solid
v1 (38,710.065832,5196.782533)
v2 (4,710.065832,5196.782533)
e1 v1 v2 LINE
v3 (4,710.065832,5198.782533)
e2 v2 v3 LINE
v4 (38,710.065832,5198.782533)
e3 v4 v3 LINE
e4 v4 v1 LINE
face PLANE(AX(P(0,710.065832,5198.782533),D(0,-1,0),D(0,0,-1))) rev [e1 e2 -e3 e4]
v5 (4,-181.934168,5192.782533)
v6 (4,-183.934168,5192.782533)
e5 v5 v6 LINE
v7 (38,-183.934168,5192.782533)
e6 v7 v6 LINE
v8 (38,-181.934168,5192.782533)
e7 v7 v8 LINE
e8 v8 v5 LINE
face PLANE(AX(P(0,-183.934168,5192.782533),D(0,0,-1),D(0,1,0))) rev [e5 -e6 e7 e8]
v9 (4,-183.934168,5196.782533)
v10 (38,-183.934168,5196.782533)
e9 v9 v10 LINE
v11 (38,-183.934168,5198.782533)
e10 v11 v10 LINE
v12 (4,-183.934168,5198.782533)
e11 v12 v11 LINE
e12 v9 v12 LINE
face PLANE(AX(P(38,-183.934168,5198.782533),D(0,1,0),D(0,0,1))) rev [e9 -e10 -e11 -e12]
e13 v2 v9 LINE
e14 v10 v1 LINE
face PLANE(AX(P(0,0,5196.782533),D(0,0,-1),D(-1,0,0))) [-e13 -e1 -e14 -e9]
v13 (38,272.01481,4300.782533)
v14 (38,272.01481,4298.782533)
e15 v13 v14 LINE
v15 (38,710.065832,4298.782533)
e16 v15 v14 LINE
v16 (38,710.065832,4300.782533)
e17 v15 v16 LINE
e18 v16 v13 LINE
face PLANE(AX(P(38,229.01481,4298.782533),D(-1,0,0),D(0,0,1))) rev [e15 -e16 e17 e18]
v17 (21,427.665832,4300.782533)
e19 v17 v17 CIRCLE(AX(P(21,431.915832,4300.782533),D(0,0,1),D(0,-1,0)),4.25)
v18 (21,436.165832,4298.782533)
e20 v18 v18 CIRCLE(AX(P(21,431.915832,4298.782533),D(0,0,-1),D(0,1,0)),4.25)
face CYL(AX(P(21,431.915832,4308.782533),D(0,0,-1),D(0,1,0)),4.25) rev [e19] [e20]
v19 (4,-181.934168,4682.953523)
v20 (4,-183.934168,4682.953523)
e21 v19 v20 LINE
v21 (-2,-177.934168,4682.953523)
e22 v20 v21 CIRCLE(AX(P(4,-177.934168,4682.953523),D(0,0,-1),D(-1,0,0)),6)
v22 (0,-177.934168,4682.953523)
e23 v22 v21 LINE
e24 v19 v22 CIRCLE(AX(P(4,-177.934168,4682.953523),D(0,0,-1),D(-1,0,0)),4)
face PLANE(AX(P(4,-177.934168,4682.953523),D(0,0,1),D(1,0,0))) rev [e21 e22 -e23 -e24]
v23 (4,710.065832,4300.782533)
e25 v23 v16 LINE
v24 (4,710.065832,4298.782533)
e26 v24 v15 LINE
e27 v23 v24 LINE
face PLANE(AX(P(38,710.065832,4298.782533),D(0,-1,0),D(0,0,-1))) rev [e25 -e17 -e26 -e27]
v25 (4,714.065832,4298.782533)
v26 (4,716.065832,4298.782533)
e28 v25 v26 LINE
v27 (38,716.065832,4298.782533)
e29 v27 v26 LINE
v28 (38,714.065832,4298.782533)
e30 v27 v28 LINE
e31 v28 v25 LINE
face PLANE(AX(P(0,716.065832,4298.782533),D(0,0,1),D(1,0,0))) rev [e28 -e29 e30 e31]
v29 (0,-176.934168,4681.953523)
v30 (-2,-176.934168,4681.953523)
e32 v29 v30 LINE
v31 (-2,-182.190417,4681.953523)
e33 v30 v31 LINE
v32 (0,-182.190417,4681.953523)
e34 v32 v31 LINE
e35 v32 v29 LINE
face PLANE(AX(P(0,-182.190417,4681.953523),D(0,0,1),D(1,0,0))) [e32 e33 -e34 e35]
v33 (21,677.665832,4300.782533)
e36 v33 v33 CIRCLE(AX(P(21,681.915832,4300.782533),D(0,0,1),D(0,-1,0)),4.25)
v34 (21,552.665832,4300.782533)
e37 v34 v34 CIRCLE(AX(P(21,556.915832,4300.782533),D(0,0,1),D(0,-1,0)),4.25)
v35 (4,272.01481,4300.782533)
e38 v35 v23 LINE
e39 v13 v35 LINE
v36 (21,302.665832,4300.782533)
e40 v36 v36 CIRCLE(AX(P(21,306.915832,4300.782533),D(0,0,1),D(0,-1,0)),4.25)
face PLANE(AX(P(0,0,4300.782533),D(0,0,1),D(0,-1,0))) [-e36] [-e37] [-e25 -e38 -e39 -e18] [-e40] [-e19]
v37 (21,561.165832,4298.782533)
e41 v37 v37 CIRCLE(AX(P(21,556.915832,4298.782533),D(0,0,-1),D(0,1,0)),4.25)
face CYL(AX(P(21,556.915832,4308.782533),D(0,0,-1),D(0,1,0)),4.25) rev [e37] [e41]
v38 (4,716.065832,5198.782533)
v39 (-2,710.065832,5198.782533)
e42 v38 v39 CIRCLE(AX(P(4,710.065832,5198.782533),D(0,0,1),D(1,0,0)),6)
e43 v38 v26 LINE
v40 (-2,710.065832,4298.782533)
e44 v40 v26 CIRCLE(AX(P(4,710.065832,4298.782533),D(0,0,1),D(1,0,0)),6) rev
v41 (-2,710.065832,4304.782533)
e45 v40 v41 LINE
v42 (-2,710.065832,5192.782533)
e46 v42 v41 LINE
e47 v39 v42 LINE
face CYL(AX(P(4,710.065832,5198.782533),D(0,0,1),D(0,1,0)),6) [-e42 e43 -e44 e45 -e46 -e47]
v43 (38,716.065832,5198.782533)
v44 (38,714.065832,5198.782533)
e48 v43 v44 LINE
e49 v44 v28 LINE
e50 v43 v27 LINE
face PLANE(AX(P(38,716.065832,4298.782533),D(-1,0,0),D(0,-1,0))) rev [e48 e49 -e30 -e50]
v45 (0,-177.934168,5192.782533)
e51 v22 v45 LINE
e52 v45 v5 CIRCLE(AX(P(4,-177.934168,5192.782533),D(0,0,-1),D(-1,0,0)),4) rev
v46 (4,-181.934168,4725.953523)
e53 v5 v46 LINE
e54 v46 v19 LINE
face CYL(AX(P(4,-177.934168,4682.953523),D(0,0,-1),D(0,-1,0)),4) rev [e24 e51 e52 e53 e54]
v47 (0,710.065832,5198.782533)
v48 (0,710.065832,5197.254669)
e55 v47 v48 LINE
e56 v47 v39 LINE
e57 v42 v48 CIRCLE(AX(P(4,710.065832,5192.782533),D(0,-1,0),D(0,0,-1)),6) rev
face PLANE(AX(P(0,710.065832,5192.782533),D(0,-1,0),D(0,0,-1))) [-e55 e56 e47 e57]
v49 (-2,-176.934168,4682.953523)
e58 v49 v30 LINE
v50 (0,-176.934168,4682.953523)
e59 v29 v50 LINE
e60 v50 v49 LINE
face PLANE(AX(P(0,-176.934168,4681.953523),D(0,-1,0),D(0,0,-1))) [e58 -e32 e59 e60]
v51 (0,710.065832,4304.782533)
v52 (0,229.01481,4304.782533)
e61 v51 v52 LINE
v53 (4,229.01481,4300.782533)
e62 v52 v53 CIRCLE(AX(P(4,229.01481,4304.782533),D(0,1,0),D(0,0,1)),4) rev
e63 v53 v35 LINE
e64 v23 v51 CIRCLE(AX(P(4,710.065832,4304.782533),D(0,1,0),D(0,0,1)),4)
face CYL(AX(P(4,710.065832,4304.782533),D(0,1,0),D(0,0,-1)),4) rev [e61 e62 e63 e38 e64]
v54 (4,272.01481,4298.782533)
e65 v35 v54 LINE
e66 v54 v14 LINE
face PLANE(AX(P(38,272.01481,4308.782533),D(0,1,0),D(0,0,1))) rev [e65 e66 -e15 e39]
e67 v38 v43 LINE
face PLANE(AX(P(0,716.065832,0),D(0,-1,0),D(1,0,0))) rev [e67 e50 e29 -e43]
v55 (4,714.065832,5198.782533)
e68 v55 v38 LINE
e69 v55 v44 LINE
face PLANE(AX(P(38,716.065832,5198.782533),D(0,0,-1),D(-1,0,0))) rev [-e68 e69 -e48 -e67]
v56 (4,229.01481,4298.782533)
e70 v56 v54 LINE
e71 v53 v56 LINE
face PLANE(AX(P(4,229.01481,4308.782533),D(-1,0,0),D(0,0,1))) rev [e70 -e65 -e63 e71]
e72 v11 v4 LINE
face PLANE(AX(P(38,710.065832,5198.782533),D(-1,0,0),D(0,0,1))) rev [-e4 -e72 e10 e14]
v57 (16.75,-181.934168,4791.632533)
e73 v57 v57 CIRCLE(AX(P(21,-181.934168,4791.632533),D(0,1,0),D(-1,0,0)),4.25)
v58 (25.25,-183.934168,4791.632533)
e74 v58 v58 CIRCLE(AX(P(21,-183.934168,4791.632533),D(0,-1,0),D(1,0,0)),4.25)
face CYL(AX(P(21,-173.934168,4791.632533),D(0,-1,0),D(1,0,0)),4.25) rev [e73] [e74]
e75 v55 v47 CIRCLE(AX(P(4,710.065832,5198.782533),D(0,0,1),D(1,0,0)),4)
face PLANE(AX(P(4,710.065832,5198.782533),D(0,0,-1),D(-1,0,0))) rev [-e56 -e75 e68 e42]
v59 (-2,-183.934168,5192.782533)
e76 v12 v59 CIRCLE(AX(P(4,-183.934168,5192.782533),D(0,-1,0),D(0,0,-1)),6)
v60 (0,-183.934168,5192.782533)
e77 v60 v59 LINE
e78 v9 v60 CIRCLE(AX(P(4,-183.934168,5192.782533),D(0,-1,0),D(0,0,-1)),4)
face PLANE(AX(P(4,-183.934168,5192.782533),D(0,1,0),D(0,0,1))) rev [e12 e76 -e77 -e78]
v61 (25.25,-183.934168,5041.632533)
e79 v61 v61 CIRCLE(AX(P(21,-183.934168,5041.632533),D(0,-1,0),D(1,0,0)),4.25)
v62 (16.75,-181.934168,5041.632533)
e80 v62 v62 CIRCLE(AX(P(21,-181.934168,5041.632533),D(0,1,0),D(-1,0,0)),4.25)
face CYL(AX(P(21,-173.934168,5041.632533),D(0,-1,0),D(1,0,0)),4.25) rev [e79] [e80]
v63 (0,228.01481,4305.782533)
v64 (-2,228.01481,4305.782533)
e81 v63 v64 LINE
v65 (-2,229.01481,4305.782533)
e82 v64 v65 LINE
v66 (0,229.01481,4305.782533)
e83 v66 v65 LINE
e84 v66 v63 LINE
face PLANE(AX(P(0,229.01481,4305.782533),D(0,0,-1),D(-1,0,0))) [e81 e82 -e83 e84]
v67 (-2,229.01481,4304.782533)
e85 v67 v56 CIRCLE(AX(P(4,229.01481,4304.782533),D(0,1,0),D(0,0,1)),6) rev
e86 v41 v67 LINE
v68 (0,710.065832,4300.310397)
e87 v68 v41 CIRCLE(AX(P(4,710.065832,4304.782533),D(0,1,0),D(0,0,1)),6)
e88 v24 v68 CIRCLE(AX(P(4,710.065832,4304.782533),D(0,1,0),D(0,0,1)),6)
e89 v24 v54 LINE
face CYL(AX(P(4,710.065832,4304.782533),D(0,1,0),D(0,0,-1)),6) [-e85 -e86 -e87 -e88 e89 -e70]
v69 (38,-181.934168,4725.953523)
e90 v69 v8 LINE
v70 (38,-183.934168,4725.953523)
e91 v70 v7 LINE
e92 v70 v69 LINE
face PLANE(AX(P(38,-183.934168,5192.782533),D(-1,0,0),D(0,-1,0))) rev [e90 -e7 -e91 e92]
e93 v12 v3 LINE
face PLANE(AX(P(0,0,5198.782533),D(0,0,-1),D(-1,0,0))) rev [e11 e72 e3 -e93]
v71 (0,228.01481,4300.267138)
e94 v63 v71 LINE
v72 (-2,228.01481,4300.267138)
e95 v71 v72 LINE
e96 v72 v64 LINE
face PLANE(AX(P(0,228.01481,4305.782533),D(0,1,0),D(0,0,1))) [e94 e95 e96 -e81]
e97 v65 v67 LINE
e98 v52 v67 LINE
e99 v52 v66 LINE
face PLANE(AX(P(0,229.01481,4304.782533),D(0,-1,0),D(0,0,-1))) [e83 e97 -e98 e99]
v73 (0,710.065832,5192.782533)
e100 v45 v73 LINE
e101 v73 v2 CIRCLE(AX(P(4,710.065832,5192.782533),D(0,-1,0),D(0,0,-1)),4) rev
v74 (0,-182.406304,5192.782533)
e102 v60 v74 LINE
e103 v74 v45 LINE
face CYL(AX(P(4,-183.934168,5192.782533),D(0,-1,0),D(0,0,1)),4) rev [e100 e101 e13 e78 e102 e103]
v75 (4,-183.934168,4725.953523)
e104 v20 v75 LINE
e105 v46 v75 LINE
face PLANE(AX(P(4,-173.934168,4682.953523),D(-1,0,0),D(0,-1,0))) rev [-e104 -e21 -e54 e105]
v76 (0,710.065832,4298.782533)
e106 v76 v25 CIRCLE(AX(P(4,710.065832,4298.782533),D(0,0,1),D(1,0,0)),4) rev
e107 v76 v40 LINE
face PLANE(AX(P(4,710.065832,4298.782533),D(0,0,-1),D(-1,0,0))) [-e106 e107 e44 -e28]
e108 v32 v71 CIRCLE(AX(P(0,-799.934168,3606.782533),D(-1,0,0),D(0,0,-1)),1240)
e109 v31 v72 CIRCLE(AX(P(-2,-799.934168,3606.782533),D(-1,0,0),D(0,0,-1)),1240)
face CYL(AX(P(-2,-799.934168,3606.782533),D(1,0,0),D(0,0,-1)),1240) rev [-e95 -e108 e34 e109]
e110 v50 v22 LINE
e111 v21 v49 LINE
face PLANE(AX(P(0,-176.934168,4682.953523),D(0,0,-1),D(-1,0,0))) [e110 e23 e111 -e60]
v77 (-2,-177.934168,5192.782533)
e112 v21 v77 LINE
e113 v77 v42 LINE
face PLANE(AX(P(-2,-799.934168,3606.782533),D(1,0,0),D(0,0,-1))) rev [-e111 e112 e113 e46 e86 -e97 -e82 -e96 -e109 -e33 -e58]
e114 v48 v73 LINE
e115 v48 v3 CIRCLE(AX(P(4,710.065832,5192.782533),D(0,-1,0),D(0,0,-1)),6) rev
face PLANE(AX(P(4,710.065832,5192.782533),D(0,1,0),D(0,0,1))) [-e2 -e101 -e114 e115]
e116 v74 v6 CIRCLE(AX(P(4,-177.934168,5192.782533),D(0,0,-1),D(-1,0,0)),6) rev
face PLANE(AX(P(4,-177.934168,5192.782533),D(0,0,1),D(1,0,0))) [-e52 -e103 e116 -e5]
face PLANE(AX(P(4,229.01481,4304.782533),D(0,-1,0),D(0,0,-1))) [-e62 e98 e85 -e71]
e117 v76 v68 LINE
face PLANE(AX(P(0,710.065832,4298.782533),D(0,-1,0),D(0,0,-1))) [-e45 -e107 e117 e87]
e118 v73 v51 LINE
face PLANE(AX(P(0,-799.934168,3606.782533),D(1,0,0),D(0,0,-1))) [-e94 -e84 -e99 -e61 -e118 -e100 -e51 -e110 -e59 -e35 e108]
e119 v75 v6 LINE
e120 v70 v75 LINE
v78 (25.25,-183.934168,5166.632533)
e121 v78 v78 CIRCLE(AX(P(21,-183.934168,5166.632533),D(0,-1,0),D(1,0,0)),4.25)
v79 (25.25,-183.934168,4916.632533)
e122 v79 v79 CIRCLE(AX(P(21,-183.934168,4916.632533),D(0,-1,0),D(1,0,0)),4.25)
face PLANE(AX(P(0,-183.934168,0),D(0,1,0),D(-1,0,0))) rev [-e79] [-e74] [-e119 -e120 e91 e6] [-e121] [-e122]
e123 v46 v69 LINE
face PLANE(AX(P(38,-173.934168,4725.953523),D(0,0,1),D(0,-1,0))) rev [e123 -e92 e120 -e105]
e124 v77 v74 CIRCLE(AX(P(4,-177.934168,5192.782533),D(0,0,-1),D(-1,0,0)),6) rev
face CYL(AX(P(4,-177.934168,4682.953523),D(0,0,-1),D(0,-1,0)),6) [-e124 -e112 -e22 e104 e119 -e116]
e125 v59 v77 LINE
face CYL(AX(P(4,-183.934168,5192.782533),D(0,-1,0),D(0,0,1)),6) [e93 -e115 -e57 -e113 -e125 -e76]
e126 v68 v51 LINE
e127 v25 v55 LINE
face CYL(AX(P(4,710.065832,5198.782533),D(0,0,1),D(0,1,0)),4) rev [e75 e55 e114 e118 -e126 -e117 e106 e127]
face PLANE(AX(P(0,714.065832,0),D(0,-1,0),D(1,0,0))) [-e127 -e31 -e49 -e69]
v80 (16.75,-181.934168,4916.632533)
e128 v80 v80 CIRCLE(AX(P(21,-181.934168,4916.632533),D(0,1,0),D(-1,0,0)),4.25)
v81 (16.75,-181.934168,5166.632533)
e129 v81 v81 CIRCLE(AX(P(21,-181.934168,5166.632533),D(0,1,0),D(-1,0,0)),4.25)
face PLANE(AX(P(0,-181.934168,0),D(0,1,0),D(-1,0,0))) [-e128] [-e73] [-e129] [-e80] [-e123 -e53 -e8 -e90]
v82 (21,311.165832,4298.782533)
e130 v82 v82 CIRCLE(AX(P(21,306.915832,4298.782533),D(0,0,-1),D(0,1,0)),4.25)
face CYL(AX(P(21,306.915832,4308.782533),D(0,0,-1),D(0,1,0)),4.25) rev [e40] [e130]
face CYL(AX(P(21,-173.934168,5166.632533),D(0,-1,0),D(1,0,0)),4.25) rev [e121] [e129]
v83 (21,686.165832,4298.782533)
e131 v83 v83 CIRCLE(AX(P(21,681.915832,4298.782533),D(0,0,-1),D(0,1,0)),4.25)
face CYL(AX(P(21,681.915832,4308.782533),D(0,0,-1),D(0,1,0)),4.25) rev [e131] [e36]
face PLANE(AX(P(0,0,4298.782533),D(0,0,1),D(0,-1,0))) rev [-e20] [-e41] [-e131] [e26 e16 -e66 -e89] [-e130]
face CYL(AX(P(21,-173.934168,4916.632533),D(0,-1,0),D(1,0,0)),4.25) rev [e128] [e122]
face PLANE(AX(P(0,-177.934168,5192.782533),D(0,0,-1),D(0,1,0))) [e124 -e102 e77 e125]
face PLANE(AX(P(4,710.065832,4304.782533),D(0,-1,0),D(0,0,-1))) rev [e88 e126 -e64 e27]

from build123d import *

# Parameters (mm, degrees)
BASE_FLANGE1_DEPTH           = 2
EDGE_FLANGE1_STRIP_W         = 16
EDGE_FLANGE1_STRIP_H         = 2
EDGE_FLANGE1_STRIP_CUT_DEPTH = 900
EDGE_FLANGE1_DEPTH           = 900
EDGE_FLANGE2_STRIP_W         = 16
EDGE_FLANGE2_STRIP_H         = 2
EDGE_FLANGE2_STRIP_CUT_DEPTH = 894
EDGE_FLANGE2_DEPTH           = 894
EDGE_FLANGE3_START           = 4681.953522875
EDGE_FLANGE3_DEPTH           = 510.829009869
EDGE_FLANGE3_2_DEPTH         = 1
EDGE_FLANGE3_START_2         = 4682.953522875
EDGE_FLANGE3_3_DEPTH         = 509.829009869
EDGE_FLANGE4_START           = 228.014810269
EDGE_FLANGE4_DEPTH           = 482.051021673
EDGE_FLANGE4_2_DEPTH         = 1
EDGE_FLANGE4_START_2         = 229.014810269
EDGE_FLANGE4_3_DEPTH         = 481.051021673
SKETCH18_W                   = 34
SKETCH18_H                   = 43
CUT_EXTRUDE1_DEPTH           = 10
SKETCH19_W                   = 34
SKETCH19_H                   = 43
CUT_EXTRUDE2_DEPTH           = 10
SKETCH20_R                   = 4.25
CUT_EXTRUDE3_DEPTH           = 10
SKETCH21_R                   = 4.25
CUT_EXTRUDE4_DEPTH           = 10


# Read off the part's stored shape, not the designer's step: Edge-Flange3, Edge-Flange4
# Sheet-metal steps are written as plain solids
with BuildPart() as part:
    # Sketch1 → Base-Flange1 (new body)
    with BuildSketch(Plane(origin=(0, 0, 0), x_dir=(0, 0, -1), z_dir=(1, 0, 0))):
        with BuildLine():
            Line((-4682.953522875, -183.934168058), (-5198.782532744, -183.934168058))
            Line((-5198.782532744, -183.934168058), (-5198.782532744, 716.065831942))
            Line((-5198.782532744, 716.065831942), (-4298.782532744, 716.065831942))
            Line((-4298.782532744, 716.065831942), (-4298.782532744, 229.014810269))
            ThreePointArc((-4298.782532744, 229.014810269), (-4514.658558014, 44.672913809), (-4682.953522875, -183.934168058))
        make_face()
    extrude(amount=-BASE_FLANGE1_DEPTH)

    # Edge-Flange1 strip (across the edge) → Edge-Flange1 strip cut (cut)
    with BuildSketch(Plane(origin=(0, 716.065831942, 4298.782532744), x_dir=(0, -1, 0), z_dir=(0, 0, 1))):
        with Locations((-2, -1)):
            Rectangle(EDGE_FLANGE1_STRIP_W, EDGE_FLANGE1_STRIP_H)
    extrude(amount=EDGE_FLANGE1_STRIP_CUT_DEPTH, mode=Mode.SUBTRACT)

    # Edge-Flange1 section (across the edge) → Edge-Flange1 (add)
    with BuildSketch(Plane(origin=(0, 716.065831942, 4298.782532744), x_dir=(0, -1, 0), z_dir=(0, 0, 1))):
        with BuildLine():
            Line((0, 4), (0, 38))
            Line((0, 38), (2, 38))
            Line((2, 38), (2, 4))
            ThreePointArc((2, 4), (3.171572875, 1.171572875), (6, 0))
            Line((6, 0), (6, -2))
            ThreePointArc((6, -2), (1.757359313, -0.242640687), (0, 4))
        make_face()
    extrude(amount=EDGE_FLANGE1_DEPTH)

    # Edge-Flange2 strip (across the edge) → Edge-Flange2 strip cut (cut)
    with BuildSketch(Plane(origin=(0, 710.065831942, 5198.782532744), x_dir=(0, 0, -1), z_dir=(0, -1, 0))):
        with Locations((-2, -1)):
            Rectangle(EDGE_FLANGE2_STRIP_W, EDGE_FLANGE2_STRIP_H)
    extrude(amount=EDGE_FLANGE2_STRIP_CUT_DEPTH, mode=Mode.SUBTRACT)

    # Edge-Flange2 section (across the edge) → Edge-Flange2 (add)
    with BuildSketch(Plane(origin=(0, 710.065831942, 5198.782532744), x_dir=(0, 0, -1), z_dir=(0, -1, 0))):
        with BuildLine():
            Line((0, 4), (0, 38))
            Line((0, 38), (2, 38))
            Line((2, 38), (2, 4))
            ThreePointArc((2, 4), (3.171572875, 1.171572875), (6, 0))
            Line((6, 0), (6, -2))
            ThreePointArc((6, -2), (1.757359313, -0.242640687), (0, 4))
        make_face()
    extrude(amount=EDGE_FLANGE2_DEPTH)

    # Edge-Flange3 outline → Edge-Flange3 (cut)
    with BuildSketch(Plane.XY.offset(EDGE_FLANGE3_START)):
        with BuildLine():
            Line((0, -183.934168058), (0, -182.406304013))
            ThreePointArc((0, -182.406304013), (-1.477225575, -180.383657801), (-2, -177.934168058))
            Line((-2, -177.934168058), (-2, -183.934168058))
            Line((-2, -183.934168058), (0, -183.934168058))
        make_face()
    extrude(amount=EDGE_FLANGE3_DEPTH, mode=Mode.SUBTRACT)

    # Edge-Flange3 2 outline → Edge-Flange3 2 (cut)
    with BuildSketch(Plane.XY.offset(EDGE_FLANGE3_START)):
        with BuildLine():
            Line((0, -182.406304013), (0, -176.934168058))
            Line((0, -176.934168058), (-2, -176.934168058))
            Line((-2, -176.934168058), (-2, -177.934168058))
            ThreePointArc((-2, -177.934168058), (-1.477225575, -180.383657801), (0, -182.406304013))
        make_face()
    extrude(amount=EDGE_FLANGE3_2_DEPTH, mode=Mode.SUBTRACT)

    # Edge-Flange3 3 outline → Edge-Flange3 3 (add)
    with BuildSketch(Plane.XY.offset(EDGE_FLANGE3_START_2)):
        with BuildLine():
            Line((38, -183.934168058), (38, -181.934168058))
            Line((38, -181.934168058), (4, -181.934168058))
            ThreePointArc((4, -181.934168058), (1.171572875, -180.762595183), (0, -177.934168058))
            Line((0, -177.934168058), (0, -182.406304013))
            ThreePointArc((0, -182.406304013), (1.859067461, -183.539202212), (4, -183.934168058))
            Line((4, -183.934168058), (38, -183.934168058))
        make_face()
    extrude(amount=EDGE_FLANGE3_3_DEPTH)

    # Edge-Flange4 outline → Edge-Flange4 (cut)
    with BuildSketch(Plane(origin=(0, 0, 0), x_dir=(1, 0, 0), z_dir=(0, 1, 0)).offset(EDGE_FLANGE4_START)):
        with BuildLine():
            ThreePointArc((-2, -4304.782532744), (-1.477225575, -4302.333043001), (0, -4300.310396789))
            Line((0, -4300.310396789), (0, -4298.782532744))
            Line((0, -4298.782532744), (-2, -4298.782532744))
            Line((-2, -4298.782532744), (-2, -4304.782532744))
        make_face()
    extrude(amount=EDGE_FLANGE4_DEPTH, mode=Mode.SUBTRACT)

    # Edge-Flange4 2 outline → Edge-Flange4 2 (cut)
    with BuildSketch(Plane(origin=(0, 0, 0), x_dir=(1, 0, 0), z_dir=(0, 1, 0)).offset(EDGE_FLANGE4_START)):
        with BuildLine():
            Line((0, -4305.782532744), (0, -4300.310396789))
            ThreePointArc((0, -4300.310396789), (-1.477225575, -4302.333043001), (-2, -4304.782532744))
            Line((-2, -4304.782532744), (-2, -4305.782532744))
            Line((-2, -4305.782532744), (0, -4305.782532744))
        make_face()
    extrude(amount=EDGE_FLANGE4_2_DEPTH, mode=Mode.SUBTRACT)

    # Edge-Flange4 3 outline → Edge-Flange4 3 (add)
    with BuildSketch(Plane(origin=(0, 0, 0), x_dir=(1, 0, 0), z_dir=(0, 1, 0)).offset(EDGE_FLANGE4_START_2)):
        with BuildLine():
            Line((38, -4298.782532744), (4, -4298.782532744))
            ThreePointArc((4, -4298.782532744), (1.859067461, -4299.17749859), (0, -4300.310396789))
            Line((0, -4300.310396789), (0, -4304.782532744))
            ThreePointArc((0, -4304.782532744), (1.171572875, -4301.954105619), (4, -4300.782532744))
            Line((4, -4300.782532744), (38, -4300.782532744))
            Line((38, -4300.782532744), (38, -4298.782532744))
        make_face()
    extrude(amount=EDGE_FLANGE4_3_DEPTH)

    # Sketch18 → Cut-Extrude1 (cut)
    with BuildSketch(Plane.XZ.offset(183.934168058)):
        with Locations((21, 4704.453522875)):
            Rectangle(SKETCH18_W, SKETCH18_H)
    extrude(amount=-CUT_EXTRUDE1_DEPTH, mode=Mode.SUBTRACT)

    # Sketch19 → Cut-Extrude2 (cut)
    with BuildSketch(Plane(origin=(0, 0, 4298.782532744), x_dir=(-1, 0, 0), z_dir=(0, 0, -1))):
        with Locations((-21, 250.514810269)):
            Rectangle(SKETCH19_W, SKETCH19_H)
    extrude(amount=-CUT_EXTRUDE2_DEPTH, mode=Mode.SUBTRACT)

    # Sketch20 → Cut-Extrude3 (cut)
    with BuildSketch(Plane.XZ.offset(183.934168058)):
        with Locations((21, 5166.632532744)):
            Circle(SKETCH20_R)
        with Locations((21, 5041.632532744)):
            Circle(SKETCH20_R)
        with Locations((21, 4916.632532744)):
            Circle(SKETCH20_R)
        with Locations((21, 4791.632532744)):
            Circle(SKETCH20_R)
    extrude(amount=-CUT_EXTRUDE3_DEPTH, mode=Mode.SUBTRACT)

    # Sketch21 → Cut-Extrude4 (cut)
    with BuildSketch(Plane(origin=(0, 0, 4298.782532744), x_dir=(-1, 0, 0), z_dir=(0, 0, -1))):
        with Locations(Location((-21, 681.915831942, 0), (0, 0, 90))):
            Circle(SKETCH21_R)
        with Locations(Location((-21, 556.915831942, 0), (0, 0, 90))):
            Circle(SKETCH21_R)
        with Locations(Location((-21, 431.915831942, 0), (0, 0, 90))):
            Circle(SKETCH21_R)
        with Locations(Location((-21, 306.915831942, 0), (0, 0, 90))):
            Circle(SKETCH21_R)
    extrude(amount=-CUT_EXTRUDE4_DEPTH, mode=Mode.SUBTRACT)


solid = part.part
